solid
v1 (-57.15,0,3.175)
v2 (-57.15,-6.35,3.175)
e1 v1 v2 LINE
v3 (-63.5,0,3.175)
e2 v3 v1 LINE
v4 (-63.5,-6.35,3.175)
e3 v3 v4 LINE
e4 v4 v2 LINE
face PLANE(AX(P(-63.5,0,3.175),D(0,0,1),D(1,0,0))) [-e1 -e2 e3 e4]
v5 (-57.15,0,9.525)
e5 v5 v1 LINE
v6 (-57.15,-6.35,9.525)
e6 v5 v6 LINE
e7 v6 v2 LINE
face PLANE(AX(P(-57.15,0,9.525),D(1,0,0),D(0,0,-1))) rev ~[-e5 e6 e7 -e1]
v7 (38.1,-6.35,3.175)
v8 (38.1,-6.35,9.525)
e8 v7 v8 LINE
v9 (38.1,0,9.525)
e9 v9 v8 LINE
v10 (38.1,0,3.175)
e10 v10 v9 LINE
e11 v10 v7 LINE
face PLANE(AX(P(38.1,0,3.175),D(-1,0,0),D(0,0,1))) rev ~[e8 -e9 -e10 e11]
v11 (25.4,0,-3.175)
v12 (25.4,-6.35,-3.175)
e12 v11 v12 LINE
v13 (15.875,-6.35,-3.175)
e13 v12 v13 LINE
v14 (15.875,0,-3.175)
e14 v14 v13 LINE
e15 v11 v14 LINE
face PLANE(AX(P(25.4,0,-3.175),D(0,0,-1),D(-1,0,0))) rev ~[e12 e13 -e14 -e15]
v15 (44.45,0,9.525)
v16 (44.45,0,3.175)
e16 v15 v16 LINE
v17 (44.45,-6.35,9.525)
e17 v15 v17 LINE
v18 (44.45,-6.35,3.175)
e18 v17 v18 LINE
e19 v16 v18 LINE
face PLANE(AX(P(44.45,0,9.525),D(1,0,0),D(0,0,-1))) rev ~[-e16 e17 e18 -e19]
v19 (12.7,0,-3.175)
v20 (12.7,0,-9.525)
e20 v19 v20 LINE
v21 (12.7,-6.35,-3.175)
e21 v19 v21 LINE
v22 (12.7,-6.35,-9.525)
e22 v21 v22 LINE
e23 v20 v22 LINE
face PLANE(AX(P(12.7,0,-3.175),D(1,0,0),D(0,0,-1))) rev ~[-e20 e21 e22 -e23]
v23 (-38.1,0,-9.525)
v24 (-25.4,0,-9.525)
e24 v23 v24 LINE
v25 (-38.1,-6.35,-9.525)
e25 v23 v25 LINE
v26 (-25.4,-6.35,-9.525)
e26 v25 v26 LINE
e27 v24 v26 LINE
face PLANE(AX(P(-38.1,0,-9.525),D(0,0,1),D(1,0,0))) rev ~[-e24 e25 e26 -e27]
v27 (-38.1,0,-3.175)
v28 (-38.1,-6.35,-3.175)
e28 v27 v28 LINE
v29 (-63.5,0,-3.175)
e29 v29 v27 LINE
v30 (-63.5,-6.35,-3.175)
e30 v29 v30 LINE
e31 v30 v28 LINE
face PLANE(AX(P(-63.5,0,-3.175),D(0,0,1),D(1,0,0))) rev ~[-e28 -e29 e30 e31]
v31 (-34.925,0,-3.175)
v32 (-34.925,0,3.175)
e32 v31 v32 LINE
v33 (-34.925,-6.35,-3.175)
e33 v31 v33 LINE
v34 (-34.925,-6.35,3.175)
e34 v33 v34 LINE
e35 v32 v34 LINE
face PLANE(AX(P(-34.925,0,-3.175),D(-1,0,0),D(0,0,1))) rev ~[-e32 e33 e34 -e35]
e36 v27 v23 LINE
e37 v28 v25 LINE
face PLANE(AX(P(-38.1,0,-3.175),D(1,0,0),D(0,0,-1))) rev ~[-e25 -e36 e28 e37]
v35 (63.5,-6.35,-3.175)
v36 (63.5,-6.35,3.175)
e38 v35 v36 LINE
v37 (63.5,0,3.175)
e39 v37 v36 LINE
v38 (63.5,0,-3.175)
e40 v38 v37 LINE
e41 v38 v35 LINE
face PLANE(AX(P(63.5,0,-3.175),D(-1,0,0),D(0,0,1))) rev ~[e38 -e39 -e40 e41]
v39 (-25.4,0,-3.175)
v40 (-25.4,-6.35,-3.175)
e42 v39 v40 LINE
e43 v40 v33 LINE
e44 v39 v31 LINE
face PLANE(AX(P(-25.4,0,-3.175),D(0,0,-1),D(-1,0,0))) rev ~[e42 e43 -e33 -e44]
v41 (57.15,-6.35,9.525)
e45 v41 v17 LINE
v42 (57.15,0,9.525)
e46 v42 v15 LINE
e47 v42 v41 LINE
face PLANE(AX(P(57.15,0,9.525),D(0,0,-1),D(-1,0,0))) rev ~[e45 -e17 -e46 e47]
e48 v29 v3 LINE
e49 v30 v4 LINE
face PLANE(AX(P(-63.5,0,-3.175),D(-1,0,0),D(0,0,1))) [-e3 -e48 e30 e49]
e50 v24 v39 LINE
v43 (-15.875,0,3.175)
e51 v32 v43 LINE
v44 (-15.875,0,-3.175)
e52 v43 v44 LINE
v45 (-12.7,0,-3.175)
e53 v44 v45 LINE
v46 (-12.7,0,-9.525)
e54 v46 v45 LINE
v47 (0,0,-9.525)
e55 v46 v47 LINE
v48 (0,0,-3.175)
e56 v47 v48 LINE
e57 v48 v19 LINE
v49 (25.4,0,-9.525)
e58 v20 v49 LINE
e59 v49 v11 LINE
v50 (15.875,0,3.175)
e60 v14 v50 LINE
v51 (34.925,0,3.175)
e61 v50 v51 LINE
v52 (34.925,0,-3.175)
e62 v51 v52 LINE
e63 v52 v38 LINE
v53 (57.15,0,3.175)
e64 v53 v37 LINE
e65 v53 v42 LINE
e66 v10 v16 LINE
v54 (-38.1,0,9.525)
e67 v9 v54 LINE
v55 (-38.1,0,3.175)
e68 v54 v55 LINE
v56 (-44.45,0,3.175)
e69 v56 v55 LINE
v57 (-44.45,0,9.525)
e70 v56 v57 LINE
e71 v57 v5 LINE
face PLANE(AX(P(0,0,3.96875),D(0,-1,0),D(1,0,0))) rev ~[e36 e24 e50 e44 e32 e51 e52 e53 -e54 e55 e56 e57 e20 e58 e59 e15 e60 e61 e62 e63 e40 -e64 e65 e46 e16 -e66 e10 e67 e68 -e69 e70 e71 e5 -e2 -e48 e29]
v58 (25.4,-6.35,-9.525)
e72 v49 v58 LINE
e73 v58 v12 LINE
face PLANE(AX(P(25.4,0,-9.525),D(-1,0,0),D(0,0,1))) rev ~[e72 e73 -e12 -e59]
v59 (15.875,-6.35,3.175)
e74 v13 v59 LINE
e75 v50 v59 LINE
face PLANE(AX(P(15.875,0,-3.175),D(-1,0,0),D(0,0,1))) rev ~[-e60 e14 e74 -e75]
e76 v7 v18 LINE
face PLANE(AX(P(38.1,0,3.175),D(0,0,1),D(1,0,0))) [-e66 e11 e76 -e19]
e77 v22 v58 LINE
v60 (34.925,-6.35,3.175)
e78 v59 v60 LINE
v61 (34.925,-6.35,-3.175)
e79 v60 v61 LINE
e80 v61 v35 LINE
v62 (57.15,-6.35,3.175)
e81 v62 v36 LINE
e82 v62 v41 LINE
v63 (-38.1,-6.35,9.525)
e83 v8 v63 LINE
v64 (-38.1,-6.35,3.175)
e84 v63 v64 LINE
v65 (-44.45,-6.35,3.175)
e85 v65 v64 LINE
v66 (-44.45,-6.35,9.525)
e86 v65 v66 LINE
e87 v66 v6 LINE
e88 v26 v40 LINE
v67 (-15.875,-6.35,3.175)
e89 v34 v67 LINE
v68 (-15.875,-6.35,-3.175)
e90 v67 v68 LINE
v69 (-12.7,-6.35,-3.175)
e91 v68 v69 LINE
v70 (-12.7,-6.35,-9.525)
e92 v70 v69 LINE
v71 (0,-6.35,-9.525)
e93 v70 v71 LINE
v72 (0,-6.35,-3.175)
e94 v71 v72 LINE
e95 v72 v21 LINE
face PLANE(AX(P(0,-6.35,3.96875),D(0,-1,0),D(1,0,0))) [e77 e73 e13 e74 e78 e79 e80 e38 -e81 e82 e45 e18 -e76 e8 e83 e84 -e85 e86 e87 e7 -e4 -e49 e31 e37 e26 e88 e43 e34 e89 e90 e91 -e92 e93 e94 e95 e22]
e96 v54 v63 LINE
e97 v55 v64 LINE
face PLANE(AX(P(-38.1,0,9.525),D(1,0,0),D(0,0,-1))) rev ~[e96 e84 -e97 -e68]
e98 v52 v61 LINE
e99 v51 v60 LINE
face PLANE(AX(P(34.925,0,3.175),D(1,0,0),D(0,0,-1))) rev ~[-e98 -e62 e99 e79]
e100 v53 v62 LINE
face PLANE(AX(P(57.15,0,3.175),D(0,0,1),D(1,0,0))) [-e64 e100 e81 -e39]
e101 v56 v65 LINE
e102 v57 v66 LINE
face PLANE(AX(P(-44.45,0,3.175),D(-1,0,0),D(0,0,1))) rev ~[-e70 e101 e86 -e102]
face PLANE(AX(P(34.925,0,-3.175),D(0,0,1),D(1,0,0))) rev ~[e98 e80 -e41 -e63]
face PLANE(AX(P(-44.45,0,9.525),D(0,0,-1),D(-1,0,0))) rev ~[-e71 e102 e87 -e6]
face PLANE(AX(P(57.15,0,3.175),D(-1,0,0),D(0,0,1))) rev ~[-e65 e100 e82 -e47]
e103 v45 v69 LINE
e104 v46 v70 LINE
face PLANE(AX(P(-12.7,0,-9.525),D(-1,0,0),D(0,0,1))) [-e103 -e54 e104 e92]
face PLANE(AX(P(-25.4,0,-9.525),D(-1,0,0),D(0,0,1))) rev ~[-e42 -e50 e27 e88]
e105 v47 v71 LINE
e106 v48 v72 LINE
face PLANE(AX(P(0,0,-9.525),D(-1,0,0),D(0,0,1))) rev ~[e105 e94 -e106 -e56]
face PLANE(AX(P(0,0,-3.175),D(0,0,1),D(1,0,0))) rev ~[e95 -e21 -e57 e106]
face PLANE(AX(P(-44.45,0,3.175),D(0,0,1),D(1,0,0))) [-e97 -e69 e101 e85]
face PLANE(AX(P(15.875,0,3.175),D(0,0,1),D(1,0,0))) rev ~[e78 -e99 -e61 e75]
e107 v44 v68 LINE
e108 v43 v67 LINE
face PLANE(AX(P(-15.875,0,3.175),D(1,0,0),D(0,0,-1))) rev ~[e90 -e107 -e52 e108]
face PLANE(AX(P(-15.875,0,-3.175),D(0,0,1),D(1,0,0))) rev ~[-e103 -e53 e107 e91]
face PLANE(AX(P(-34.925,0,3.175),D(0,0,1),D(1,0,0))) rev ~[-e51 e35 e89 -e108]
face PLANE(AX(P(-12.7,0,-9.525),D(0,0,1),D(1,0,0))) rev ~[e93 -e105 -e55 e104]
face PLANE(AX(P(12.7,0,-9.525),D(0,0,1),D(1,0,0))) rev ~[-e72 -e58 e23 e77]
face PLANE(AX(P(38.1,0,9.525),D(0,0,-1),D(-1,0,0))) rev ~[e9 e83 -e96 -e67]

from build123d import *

# Parameters (mm, degrees)
F0_W     = 6.35
F0_H     = 6.35
F0_W_2   = 12.7
F1_DEPTH = 6.35


# Not quite as in the source:
# - a feature names something its author has since deleted; it is built from what else it names


with BuildPart() as f1:
    # F0 (on Front) → F1 (new body)
    with BuildSketch(Plane.XZ):
        Polygon((38.1, 3.175), (38.1, 9.525), (-38.1, 9.525), (-38.1, 3.175), (-38.1, -3.175), (-34.925, -3.175), (-34.925, 3.175), (-15.875, 3.175), (-15.875, -3.175), (-12.7, -3.175), (0, -3.175), (12.7, -3.175), (15.875, -3.175), (15.875, 3.175), (34.925, 3.175), (34.925, -3.175), (38.1, -3.175), align=None)
        Polygon((-44.45, 3.175), (-44.45, 9.525), (-57.15, 9.525), (-57.15, 3.175), (-57.15, -3.175), (-44.45, -3.175), align=None)
        with Locations((-60.325, 0)):
            Rectangle(F0_W, F0_H)
        with Locations((-41.275, 0)):
            Rectangle(F0_W, F0_H)
        with Locations((41.275, 0)):
            Rectangle(F0_W, F0_H)
        with Locations((60.325, 0)):
            Rectangle(F0_W, F0_H)
        Polygon((57.15, 3.175), (57.15, 9.525), (44.45, 9.525), (44.45, 3.175), (44.45, -3.175), (57.15, -3.175), align=None)
        Polygon((-34.925, -3.175), (-38.1, -3.175), (-38.1, -9.525), (-25.4, -9.525), (-25.4, -3.175), align=None)
        with Locations((-6.35, -6.35)):
            Rectangle(F0_W_2, F0_H)
        Polygon((12.7, -9.525), (25.4, -9.525), (25.4, -3.175), (19.05, -3.175), (15.875, -3.175), (12.7, -3.175), align=None)
    extrude(amount=F1_DEPTH)


solid = f1.part
